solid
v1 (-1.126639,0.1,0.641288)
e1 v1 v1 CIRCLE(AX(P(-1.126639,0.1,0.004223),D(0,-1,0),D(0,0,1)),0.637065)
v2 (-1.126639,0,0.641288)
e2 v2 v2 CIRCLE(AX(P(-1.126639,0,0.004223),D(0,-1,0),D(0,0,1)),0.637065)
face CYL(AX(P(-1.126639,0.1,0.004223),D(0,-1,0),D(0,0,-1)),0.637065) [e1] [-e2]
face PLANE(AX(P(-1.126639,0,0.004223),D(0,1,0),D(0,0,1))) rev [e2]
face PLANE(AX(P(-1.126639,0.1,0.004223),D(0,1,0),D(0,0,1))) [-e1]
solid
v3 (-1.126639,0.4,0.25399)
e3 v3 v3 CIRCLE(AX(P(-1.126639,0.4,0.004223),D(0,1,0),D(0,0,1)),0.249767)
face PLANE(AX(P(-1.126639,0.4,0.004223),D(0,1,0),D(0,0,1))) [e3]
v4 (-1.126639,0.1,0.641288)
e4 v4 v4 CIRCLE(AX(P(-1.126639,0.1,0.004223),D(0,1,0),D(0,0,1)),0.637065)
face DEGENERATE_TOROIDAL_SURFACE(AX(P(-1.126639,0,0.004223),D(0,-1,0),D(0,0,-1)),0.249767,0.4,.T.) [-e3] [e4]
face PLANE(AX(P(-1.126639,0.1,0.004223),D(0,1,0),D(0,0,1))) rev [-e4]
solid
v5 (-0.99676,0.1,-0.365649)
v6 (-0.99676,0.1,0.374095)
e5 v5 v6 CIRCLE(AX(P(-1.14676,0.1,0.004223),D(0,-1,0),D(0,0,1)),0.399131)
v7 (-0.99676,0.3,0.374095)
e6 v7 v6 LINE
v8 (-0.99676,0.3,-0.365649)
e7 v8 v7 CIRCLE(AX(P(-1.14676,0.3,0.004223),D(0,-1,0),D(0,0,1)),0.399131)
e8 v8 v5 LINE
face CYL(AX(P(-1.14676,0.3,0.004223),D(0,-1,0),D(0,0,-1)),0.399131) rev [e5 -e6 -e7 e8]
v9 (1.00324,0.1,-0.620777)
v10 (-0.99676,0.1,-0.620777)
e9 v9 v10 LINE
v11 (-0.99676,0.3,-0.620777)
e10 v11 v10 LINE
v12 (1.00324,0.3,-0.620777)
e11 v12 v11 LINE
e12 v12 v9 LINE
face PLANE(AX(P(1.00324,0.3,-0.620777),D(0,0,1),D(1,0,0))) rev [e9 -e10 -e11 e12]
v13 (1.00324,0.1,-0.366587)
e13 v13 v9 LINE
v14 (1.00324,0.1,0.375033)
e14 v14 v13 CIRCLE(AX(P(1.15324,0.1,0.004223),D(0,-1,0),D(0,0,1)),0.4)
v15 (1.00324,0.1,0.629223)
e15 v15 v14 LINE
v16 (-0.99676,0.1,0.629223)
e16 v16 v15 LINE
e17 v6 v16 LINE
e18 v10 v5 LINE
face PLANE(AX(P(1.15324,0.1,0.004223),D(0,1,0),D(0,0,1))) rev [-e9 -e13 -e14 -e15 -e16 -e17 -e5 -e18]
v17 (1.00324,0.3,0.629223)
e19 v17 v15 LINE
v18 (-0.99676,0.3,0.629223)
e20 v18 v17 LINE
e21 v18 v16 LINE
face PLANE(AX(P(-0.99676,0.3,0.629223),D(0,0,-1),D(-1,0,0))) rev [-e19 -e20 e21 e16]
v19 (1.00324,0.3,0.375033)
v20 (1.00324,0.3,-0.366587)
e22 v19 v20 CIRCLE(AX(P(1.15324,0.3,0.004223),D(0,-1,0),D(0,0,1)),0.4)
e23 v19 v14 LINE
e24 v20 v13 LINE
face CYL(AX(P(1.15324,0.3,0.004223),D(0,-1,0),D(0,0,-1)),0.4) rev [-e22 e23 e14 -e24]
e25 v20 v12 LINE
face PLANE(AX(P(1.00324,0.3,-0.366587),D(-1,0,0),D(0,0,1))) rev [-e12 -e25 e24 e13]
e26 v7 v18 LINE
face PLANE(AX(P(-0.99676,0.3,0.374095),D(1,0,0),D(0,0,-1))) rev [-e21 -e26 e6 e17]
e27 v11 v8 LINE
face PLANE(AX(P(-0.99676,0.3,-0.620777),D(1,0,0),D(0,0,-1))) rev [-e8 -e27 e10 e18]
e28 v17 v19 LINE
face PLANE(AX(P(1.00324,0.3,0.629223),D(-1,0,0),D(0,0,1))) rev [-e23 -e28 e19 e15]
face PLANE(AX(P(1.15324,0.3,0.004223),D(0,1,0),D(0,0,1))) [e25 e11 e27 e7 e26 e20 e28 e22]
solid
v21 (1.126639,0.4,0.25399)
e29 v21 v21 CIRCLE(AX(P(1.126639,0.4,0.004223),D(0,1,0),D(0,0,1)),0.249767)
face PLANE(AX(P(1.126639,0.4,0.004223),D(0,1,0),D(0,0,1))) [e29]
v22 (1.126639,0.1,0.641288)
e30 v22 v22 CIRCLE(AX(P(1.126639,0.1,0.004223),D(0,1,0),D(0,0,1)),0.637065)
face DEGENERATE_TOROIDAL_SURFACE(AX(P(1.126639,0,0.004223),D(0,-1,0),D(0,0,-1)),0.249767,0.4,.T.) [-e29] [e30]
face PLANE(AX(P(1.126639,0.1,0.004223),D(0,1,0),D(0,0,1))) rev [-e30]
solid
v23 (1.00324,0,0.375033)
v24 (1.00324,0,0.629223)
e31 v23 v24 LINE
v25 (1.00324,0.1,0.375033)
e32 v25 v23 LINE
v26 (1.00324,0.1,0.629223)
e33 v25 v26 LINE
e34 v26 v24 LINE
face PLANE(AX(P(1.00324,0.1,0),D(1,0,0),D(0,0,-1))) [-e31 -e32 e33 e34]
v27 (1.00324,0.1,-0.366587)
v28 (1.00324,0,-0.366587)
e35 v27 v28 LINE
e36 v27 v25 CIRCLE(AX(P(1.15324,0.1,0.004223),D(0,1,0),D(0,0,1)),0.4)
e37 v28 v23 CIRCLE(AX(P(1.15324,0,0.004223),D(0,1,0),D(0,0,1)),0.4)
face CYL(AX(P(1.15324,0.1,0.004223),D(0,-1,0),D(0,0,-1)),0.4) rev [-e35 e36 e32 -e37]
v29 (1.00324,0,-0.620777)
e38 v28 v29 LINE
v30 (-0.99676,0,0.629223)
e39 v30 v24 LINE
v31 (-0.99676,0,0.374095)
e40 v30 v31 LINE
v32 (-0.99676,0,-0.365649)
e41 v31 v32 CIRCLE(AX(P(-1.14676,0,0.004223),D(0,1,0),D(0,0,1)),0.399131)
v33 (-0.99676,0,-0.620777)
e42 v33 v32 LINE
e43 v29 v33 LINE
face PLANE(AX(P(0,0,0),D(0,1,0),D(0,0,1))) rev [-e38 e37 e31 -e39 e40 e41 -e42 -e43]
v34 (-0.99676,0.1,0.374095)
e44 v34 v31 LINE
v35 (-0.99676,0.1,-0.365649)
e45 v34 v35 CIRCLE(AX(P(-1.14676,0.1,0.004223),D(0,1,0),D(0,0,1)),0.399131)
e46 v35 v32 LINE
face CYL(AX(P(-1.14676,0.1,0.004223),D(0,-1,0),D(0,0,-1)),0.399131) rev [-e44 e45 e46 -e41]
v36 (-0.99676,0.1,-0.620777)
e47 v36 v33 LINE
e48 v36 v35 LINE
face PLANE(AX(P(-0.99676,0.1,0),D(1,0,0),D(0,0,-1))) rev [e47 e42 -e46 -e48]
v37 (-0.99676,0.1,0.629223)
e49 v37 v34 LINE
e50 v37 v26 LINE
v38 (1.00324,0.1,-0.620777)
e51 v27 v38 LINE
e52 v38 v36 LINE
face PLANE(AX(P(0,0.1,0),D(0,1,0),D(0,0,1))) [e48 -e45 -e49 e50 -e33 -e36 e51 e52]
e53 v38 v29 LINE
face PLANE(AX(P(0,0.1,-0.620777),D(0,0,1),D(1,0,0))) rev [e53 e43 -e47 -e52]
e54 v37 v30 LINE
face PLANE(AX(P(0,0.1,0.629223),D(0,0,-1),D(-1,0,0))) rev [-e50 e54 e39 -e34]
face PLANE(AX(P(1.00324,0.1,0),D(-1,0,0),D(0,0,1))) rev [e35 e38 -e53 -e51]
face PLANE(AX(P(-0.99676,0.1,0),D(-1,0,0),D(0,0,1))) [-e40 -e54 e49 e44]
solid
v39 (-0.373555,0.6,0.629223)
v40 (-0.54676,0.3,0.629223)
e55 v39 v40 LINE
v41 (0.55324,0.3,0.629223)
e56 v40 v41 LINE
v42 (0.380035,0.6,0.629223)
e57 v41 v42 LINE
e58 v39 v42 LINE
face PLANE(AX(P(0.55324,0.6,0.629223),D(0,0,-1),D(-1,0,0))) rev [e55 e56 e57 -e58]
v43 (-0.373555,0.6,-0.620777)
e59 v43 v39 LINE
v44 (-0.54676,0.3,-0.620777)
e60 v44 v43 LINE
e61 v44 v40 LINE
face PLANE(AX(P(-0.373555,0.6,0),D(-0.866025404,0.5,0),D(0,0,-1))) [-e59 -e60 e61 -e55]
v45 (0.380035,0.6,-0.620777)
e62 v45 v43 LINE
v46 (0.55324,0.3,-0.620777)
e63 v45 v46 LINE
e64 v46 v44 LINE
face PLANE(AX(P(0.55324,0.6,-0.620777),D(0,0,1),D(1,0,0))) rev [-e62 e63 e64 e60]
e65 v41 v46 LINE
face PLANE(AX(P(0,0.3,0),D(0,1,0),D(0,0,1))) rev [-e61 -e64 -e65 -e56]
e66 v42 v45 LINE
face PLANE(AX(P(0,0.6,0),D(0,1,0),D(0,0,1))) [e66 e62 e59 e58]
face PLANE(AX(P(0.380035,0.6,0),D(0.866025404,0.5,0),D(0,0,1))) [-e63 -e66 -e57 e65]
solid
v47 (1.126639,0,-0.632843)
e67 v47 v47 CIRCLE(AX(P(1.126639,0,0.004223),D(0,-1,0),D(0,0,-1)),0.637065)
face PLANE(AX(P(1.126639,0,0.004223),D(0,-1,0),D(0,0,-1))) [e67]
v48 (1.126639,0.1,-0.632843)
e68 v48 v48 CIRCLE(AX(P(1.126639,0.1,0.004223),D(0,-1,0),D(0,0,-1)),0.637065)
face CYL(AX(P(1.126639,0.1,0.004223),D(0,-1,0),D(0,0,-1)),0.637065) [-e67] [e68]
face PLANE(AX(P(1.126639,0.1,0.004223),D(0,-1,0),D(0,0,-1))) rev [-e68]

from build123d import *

# Parameters (mm, degrees)
BOSS_EXTRUDE1_DEPTH   = 0.1
SKETCH2_R             = 0.637065443
BOSS_EXTRUDE2_DEPTH   = 0.1
BOSS_EXTRUDE2_2_DEPTH = 0.1
BOSS_EXTRUDE3_DEPTH   = 0.2
SKETCH5_R             = 0.637065443
BOSS_EXTRUDE4_DEPTH   = 0.3
SKETCH6_R             = 0.637065443
BOSS_EXTRUDE5_DEPTH   = 0.3
FILLET1_R             = 0.4
FILLET2_R             = 0.4
SKETCH10_W            = 1.1
SKETCH10_H            = 1.25
BOSS_EXTRUDE6_DEPTH   = 0.3
CHAMFER1_SIZE         = 0.3
CHAMFER1_SIZE_2       = 0.173205081


with BuildPart() as part:
    # Sketch1 → Boss-Extrude1 (new body)
    with BuildSketch(Plane(origin=(0, 0, 0), x_dir=(1, 0, 0), z_dir=(0, 1, 0))):
        with BuildLine():
            ThreePointArc((1.003239919, 0.366587161), (0.753239919, -0.004222763), (1.003239919, -0.375032687))
            Line((1.003239919, -0.375032687), (1.003239919, -0.629222763))
            Line((1.003239919, -0.629222763), (-0.996760081, -0.629222763))
            Line((-0.996760081, -0.629222763), (-0.996760081, -0.374094755))
            ThreePointArc((-0.996760081, -0.374094755), (-0.747629413, -0.004222763), (-0.996760081, 0.365649229))
            Line((-0.996760081, 0.365649229), (-0.996760081, 0.620777237))
            Line((-0.996760081, 0.620777237), (1.003239919, 0.620777237))
            Line((1.003239919, 0.620777237), (1.003239919, 0.366587161))
        make_face()
    extrude(amount=BOSS_EXTRUDE1_DEPTH)


with BuildPart() as body_2:
    # Sketch2 → Boss-Extrude2 (new body)
    with BuildSketch(Plane.XZ):
        with Locations(Location((-1.126639185, 0.004222763, 0), (0, 0, 90))):
            Circle(SKETCH2_R)
    extrude(amount=-BOSS_EXTRUDE2_DEPTH)


with BuildPart() as body_3:
    # Sketch2 → Boss-Extrude2 2 (new body)
    with BuildSketch(Plane.XZ):
        with Locations(Location((1.126639185, 0.004222763, 0), (0, 0, 270))):
            Circle(SKETCH2_R)
    extrude(amount=-BOSS_EXTRUDE2_2_DEPTH)


with BuildPart() as body_4:
    # Sketch4 → Boss-Extrude3 (new body)
    with BuildSketch(Plane(origin=(0, 0.1, 0), x_dir=(1, 0, 0), z_dir=(0, 1, 0))):
        with BuildLine():
            Line((1.003239919, 0.366587161), (1.003239919, 0.620777237))
            Line((1.003239919, 0.620777237), (-0.996760081, 0.620777237))
            Line((-0.996760081, 0.620777237), (-0.996760081, 0.365649229))
            ThreePointArc((-0.996760081, 0.365649229), (-0.747629413, -0.004222763), (-0.996760081, -0.374094755))
            Line((-0.996760081, -0.374094755), (-0.996760081, -0.629222763))
            Line((-0.996760081, -0.629222763), (1.003239919, -0.629222763))
            Line((1.003239919, -0.629222763), (1.003239919, -0.375032687))
            ThreePointArc((1.003239919, -0.375032687), (0.753239919, -0.004222763), (1.003239919, 0.366587161))
        make_face()
    extrude(amount=BOSS_EXTRUDE3_DEPTH)


with BuildPart() as body_5:
    # Sketch5 → Boss-Extrude4 (new body)
    with BuildSketch(Plane(origin=(0, 0.1, 0), x_dir=(1, 0, 0), z_dir=(0, 1, 0))):
        with Locations(Location((1.126639185, -0.004222763, 0), (0, 0, 270))):
            Circle(SKETCH5_R)
    extrude(amount=BOSS_EXTRUDE4_DEPTH)

    # Fillet1
    # the kernel refuses this fillet: 0.4 mm, written as the material it takes off along each edge
    with BuildSketch(Plane(origin=(1.126639185, 0.4, 0.004222763), x_dir=(0, 0, 1), z_dir=(-1, 0, 0))) as fillet1_piece_1:
        with BuildLine():
            CenterArc((0.249767109, -0.4), FILLET1_R, 14.477512186, 75.522487814)
            Line((0.249767109, 0), (0.249767109, 0.008))
            Line((0.249767109, 0.008), (0.637065443, 0.008))
            Line((0.637065443, 0.008), (0.645065443, 0))
            ThreePointArc((0.645065443, 0), (0.645065443, -0.15), (0.64481141, -0.298))
            Line((0.64481141, -0.298), (0.637065443, -0.3))
        make_face()
    revolve(axis=Axis((1.126639185, 0.4, 0.004222763), (0, 1, 0)), mode=Mode.SUBTRACT)


with BuildPart() as body_6:
    # Sketch6 → Boss-Extrude5 (new body)
    with BuildSketch(Plane(origin=(0, 0.1, 0), x_dir=(1, 0, 0), z_dir=(0, 1, 0))):
        with Locations(Location((-1.126639185, -0.004222763, 0), (0, 0, 270))):
            Circle(SKETCH6_R)
    extrude(amount=BOSS_EXTRUDE5_DEPTH)

    # Fillet2
    # the kernel refuses this fillet: 0.4 mm, written as the material it takes off along each edge
    with BuildSketch(Plane(origin=(-1.126639185, 0.4, 0.004222763), x_dir=(0, 0, 1), z_dir=(-1, 0, 0))) as fillet2_piece_1:
        with BuildLine():
            CenterArc((0.249767109, -0.4), FILLET2_R, 14.477512186, 75.522487814)
            Line((0.249767109, 0), (0.249767109, 0.008))
            Line((0.249767109, 0.008), (0.637065443, 0.008))
            Line((0.637065443, 0.008), (0.645065443, 0))
            ThreePointArc((0.645065443, 0), (0.645065443, -0.15), (0.64481141, -0.298))
            Line((0.64481141, -0.298), (0.637065443, -0.3))
        make_face()
    revolve(axis=Axis((-1.126639185, 0.4, 0.004222763), (0, 1, 0)), mode=Mode.SUBTRACT)


with BuildPart() as body_7:
    # Sketch10 → Boss-Extrude6 (new body)
    with BuildSketch(Plane(origin=(0, 0.3, 0), x_dir=(1, 0, 0), z_dir=(0, 1, 0))):
        with Locations((0.003239919, -0.004222763)):
            Rectangle(SKETCH10_W, SKETCH10_H)
    extrude(amount=BOSS_EXTRUDE6_DEPTH)

    # Chamfer1
    # the kernel refuses this chamfer: 0.3, 0.173205081 mm, written as the material it takes off along each edge
    with BuildSketch(Plane(origin=(-0.546760081, 0.6, -1.396902964), x_dir=(-0.019326765612700723, -0.999813220622208, 0), z_dir=(0, 0, 1)), Plane(origin=(0.553239919, 0.6, 1.405348489), x_dir=(0.019326765612700723, -0.999813220622208, 0), z_dir=(0, 0, -1))) as chamfer1_piece_1:
        Polygon((CHAMFER1_SIZE * 0.999813220622, CHAMFER1_SIZE * 0.0193267656127), (-CHAMFER1_SIZE_2 * 0.0193267655856, CHAMFER1_SIZE_2 * 0.999813219219), (0, 0), align=None)
    extrude(amount=2.802251453, mode=Mode.SUBTRACT)


solid = Compound([part.part, body_2.part, body_3.part, body_4.part, body_5.part, body_6.part, body_7.part])
